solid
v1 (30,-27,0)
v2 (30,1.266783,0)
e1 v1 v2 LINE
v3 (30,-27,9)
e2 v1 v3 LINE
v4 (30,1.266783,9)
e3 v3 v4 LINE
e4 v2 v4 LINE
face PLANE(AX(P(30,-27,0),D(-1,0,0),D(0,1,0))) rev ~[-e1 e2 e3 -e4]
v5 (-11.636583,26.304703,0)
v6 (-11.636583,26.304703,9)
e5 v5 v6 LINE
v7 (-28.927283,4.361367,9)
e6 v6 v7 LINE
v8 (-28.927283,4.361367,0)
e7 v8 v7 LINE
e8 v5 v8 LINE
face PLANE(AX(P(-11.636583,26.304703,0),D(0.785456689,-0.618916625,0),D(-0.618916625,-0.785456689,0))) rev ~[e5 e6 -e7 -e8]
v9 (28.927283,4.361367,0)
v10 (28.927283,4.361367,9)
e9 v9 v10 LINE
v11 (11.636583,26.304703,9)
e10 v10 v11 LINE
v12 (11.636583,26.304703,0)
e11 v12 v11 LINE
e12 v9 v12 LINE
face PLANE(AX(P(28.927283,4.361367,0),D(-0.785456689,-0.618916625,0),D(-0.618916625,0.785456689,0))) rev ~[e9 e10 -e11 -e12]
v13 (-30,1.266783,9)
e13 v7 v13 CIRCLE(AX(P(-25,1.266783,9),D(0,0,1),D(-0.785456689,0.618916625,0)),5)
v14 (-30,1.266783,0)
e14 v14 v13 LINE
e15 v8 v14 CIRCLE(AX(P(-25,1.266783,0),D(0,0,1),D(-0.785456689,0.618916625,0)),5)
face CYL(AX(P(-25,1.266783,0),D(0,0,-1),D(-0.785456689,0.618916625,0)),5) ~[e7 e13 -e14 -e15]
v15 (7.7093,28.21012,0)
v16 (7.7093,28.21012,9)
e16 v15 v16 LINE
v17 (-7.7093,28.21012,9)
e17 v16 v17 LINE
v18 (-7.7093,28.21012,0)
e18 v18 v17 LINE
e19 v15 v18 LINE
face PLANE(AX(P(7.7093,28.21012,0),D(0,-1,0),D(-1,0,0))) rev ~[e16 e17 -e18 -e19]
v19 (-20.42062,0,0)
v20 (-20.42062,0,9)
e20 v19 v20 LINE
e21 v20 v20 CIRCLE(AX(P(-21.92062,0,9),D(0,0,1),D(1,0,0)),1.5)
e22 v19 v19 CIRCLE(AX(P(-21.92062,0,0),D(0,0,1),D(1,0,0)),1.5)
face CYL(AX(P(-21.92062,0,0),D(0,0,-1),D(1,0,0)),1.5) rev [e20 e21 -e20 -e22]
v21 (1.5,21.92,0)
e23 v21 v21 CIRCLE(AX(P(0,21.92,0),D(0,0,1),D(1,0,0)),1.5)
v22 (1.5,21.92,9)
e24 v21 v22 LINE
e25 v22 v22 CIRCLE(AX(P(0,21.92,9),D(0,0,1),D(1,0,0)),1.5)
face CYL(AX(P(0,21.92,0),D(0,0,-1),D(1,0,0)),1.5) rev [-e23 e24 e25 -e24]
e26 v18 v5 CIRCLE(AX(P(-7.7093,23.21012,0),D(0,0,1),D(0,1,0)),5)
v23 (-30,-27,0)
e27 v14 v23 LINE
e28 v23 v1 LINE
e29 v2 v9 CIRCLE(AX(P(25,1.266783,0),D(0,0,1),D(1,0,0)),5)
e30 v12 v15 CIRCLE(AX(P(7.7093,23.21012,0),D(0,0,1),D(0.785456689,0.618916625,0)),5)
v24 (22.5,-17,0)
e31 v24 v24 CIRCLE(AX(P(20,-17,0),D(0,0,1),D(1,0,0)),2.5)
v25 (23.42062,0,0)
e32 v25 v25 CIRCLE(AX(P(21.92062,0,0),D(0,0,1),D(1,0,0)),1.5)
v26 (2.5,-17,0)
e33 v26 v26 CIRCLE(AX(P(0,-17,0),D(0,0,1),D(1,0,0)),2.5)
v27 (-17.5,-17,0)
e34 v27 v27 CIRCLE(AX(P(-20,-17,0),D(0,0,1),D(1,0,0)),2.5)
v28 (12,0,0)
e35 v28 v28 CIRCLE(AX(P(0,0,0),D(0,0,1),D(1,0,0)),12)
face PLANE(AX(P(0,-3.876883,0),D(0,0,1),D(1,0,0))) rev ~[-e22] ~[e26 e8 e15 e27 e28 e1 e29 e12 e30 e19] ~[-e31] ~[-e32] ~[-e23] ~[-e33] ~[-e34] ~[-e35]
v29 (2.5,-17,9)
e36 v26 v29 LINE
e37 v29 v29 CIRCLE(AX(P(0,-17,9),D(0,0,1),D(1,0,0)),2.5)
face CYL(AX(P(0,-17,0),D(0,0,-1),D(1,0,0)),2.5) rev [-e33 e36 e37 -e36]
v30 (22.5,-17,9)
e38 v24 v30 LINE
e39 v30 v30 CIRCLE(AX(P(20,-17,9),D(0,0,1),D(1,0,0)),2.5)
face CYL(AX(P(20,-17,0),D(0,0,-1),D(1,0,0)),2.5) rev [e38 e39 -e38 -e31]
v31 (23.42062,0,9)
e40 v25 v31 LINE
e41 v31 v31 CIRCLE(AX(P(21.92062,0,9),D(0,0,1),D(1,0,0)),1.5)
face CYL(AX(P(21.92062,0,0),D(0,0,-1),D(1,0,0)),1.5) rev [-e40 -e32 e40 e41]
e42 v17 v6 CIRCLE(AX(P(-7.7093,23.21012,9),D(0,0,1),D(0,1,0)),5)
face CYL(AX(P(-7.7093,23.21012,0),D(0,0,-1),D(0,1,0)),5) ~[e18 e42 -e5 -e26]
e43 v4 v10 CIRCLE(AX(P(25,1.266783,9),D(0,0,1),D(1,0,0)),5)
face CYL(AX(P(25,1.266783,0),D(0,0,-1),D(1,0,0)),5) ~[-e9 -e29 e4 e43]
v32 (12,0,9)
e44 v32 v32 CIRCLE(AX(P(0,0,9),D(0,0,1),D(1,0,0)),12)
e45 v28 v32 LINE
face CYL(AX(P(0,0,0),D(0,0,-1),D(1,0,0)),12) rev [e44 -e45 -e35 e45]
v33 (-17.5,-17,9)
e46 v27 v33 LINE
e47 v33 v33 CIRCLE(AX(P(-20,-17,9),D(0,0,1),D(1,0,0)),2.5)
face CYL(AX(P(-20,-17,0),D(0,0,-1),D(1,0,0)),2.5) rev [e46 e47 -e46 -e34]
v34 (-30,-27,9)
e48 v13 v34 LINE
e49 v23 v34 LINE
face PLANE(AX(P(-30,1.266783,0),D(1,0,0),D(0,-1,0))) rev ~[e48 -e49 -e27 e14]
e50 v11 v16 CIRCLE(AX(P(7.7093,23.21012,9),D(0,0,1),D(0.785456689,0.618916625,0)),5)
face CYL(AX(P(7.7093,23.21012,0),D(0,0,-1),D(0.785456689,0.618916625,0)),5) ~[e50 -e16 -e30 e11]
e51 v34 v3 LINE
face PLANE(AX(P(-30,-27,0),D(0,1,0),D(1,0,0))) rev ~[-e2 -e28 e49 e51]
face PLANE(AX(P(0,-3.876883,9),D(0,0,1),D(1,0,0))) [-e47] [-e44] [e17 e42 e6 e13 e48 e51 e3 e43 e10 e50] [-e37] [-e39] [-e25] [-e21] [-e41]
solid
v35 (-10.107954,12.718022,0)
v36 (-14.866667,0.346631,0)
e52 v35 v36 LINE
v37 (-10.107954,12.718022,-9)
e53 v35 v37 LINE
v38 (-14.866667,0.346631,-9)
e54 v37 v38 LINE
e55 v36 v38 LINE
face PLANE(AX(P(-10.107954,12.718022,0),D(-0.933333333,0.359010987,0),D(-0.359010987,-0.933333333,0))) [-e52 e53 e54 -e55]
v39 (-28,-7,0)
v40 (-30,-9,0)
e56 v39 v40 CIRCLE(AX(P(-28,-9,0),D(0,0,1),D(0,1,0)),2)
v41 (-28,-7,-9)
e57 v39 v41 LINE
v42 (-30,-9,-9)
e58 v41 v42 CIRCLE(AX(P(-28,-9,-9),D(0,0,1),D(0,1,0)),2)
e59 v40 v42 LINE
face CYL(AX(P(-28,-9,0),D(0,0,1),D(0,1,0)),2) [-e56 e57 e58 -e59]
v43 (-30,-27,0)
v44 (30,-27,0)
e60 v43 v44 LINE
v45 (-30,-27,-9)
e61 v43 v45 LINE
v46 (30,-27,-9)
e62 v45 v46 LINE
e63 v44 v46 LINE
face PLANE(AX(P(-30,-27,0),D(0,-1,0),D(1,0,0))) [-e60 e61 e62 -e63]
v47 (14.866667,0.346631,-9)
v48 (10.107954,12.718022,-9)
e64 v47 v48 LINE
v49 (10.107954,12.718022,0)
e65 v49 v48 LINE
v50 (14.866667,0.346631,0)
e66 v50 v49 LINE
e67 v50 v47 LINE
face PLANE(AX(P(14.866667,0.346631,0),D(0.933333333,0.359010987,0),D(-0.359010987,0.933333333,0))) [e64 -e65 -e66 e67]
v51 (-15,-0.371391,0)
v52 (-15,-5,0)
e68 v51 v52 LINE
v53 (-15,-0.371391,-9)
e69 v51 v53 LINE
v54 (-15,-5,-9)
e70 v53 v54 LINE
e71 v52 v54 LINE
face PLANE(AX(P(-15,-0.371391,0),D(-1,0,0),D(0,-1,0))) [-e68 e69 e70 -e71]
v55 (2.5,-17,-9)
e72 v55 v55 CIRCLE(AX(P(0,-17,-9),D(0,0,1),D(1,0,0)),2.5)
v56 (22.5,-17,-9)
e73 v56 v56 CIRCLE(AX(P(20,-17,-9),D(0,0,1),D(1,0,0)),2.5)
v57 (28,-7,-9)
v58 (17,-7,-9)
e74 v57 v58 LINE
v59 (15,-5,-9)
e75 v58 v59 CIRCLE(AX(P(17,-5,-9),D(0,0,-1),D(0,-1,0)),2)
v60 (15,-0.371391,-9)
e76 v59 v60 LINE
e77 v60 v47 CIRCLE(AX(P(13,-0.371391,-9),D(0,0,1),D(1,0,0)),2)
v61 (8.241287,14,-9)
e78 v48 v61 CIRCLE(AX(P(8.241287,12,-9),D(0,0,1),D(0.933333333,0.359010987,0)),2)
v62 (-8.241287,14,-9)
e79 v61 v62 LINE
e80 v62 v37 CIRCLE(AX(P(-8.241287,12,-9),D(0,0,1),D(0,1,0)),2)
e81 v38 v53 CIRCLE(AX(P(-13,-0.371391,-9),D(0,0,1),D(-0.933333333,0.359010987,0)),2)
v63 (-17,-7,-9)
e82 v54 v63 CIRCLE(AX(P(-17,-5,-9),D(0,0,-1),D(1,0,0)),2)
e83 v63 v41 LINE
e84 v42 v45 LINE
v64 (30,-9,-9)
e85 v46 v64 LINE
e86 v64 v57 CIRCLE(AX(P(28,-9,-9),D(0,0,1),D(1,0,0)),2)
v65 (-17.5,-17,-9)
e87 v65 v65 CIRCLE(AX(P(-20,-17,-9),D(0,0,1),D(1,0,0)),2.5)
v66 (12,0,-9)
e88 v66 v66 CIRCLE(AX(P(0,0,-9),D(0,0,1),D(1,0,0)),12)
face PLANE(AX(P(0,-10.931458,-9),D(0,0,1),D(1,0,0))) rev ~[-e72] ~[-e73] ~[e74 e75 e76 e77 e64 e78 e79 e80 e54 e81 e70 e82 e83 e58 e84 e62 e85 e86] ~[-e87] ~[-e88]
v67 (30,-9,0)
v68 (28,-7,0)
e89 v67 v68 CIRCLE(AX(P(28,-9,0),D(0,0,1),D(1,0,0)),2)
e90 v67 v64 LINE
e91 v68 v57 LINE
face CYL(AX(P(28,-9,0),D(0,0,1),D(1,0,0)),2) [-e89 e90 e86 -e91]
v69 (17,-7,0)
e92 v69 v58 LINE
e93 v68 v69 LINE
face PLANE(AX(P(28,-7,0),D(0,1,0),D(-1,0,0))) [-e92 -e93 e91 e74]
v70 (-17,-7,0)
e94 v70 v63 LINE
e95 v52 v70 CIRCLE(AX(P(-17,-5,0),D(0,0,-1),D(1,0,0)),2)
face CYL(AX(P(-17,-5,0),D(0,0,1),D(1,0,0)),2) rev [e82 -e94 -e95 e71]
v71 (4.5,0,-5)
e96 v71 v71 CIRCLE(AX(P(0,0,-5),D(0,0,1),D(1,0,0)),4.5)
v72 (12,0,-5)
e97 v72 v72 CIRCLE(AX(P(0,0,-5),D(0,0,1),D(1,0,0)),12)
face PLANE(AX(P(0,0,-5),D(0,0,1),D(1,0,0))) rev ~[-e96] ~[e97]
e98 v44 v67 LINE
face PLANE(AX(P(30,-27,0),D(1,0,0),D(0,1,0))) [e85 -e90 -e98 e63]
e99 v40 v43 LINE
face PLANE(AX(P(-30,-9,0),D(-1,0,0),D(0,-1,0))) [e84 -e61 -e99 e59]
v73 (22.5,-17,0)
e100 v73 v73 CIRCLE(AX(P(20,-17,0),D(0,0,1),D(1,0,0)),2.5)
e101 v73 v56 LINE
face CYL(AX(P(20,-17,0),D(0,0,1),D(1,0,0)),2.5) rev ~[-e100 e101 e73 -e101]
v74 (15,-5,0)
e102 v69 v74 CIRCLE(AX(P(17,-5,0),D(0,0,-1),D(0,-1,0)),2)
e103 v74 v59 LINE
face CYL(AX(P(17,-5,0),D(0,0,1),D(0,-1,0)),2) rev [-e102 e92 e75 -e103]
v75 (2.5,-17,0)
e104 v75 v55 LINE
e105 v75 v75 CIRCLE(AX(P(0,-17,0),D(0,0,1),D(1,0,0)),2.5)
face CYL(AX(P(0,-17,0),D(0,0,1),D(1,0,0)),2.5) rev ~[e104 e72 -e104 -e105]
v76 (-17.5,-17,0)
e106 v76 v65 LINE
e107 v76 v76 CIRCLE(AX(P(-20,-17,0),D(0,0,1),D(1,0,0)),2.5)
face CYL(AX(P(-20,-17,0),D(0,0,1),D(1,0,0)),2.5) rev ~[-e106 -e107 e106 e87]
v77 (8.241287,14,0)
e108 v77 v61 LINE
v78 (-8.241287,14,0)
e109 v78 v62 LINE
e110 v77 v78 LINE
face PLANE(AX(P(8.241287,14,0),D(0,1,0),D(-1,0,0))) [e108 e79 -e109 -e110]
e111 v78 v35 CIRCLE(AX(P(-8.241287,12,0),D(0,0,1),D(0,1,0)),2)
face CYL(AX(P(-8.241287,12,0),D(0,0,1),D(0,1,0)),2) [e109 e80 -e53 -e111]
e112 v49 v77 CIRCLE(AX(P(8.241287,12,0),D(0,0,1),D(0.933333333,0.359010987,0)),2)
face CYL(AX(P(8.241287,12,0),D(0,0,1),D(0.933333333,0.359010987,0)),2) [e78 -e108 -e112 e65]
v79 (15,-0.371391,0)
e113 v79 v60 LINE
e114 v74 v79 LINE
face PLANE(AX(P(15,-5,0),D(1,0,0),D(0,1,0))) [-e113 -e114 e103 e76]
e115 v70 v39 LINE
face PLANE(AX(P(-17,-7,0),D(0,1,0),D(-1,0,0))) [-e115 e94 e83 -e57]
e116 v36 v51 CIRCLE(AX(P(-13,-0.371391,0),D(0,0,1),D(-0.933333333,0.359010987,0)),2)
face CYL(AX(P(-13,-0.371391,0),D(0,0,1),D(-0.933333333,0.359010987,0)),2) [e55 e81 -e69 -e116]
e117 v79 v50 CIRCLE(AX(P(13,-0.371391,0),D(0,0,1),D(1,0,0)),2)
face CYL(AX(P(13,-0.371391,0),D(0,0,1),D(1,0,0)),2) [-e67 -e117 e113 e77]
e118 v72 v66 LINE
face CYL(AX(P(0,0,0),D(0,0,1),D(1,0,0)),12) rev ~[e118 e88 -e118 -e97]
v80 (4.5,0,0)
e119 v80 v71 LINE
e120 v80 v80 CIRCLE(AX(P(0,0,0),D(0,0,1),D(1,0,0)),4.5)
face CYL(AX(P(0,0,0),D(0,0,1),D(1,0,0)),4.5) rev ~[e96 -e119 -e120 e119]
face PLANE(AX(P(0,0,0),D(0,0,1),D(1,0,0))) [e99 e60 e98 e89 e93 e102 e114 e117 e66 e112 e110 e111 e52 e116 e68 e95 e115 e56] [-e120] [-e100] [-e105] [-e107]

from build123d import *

# Parameters (mm, degrees)
F0_R     = 2.5
F0_R_2   = 1.5
F0_R_3   = 12
F2_DEPTH = 9
F1_R     = 2.5
F1_R_2   = 12
F3_DEPTH = 9
F1_R_3   = 4.5
F4_DEPTH = 5


with BuildPart() as f2:
    # F0 (on Top) → F2 (new body)
    with BuildSketch(Plane.XY):
        with BuildLine():
            Line((-1.4435148332, 28.2101202756), (-7.7092999779, 28.2101202756))
            ThreePointArc((-7.7092999779, 28.2101202756), (-9.8918540281, 27.7086153371), (-11.6365834243, 26.3047034029))
            Line((-11.6365834243, 26.3047034029), (-28.9272834464, 4.3613665526))
            ThreePointArc((-28.9272834464, 4.3613665526), (-29.7242151323, 2.9044010192), (-30, 1.2667834253))
            Line((-30, 1.2667834253), (-30, 0))
            Line((-30, 0), (-30, -27))
            Line((-30, -27), (30, -27))
            Line((30, -27), (30, 0))
            Line((30, 0), (30, 1.2667834253))
            ThreePointArc((30, 1.2667834253), (29.7242151323, 2.9044010192), (28.9272834464, 4.3613665526))
            Line((28.9272834464, 4.3613665526), (11.6365834243, 26.3047034029))
            ThreePointArc((11.6365834243, 26.3047034029), (9.8918540281, 27.7086153371), (7.7092999779, 28.2101202756))
            Line((7.7092999779, 28.2101202756), (-1.4435148332, 28.2101202756))
        make_face()
        with Locations((-20, -17)):
            Circle(F0_R, mode=Mode.SUBTRACT)
        with Locations((-21.9206204292, 0)):
            Circle(F0_R_2, mode=Mode.SUBTRACT)
        with Locations((0, -17)):
            Circle(F0_R, mode=Mode.SUBTRACT)
        with Locations((20, -17)):
            Circle(F0_R, mode=Mode.SUBTRACT)
        Circle(F0_R_3, mode=Mode.SUBTRACT)
        with Locations((21.9206204292, 0)):
            Circle(F0_R_2, mode=Mode.SUBTRACT)
        with Locations((0, 21.92)):
            Circle(F0_R_2, mode=Mode.SUBTRACT)
    extrude(amount=F2_DEPTH)


with BuildPart() as f3:
    # F1 (on Top) → F3 (new body)
    with BuildSketch(Plane.XY):
        with BuildLine():
            ThreePointArc((-28, -7), (-29.4142135624, -7.5857864376), (-30, -9))
            Line((-30, -9), (-30, -27))
            Line((-30, -27), (30, -27))
            Line((30, -27), (30, -9))
            ThreePointArc((30, -9), (29.4142135624, -7.5857864376), (28, -7))
            Line((28, -7), (17, -7))
            ThreePointArc((17, -7), (15.5857864376, -6.4142135624), (15, -5))
            Line((15, -5), (15, -0.3713906764))
            ThreePointArc((15, -0.3713906764), (14.9663841605, -0.0062423047), (14.8666666667, 0.3466312979))
            Line((14.8666666667, 0.3466312979), (10.1079539748, 12.7180219743))
            ThreePointArc((10.1079539748, 12.7180219743), (9.3735319927, 13.6486424641), (8.2412873082, 14))
            Line((8.2412873082, 14), (0, 14))
            Line((0, 14), (-8.2412873082, 14))
            ThreePointArc((-8.2412873082, 14), (-9.3735319927, 13.6486424641), (-10.1079539748, 12.7180219743))
            Line((-10.1079539748, 12.7180219743), (-14.8666666667, 0.3466312979))
            ThreePointArc((-14.8666666667, 0.3466312979), (-14.9663841605, -0.0062423047), (-15, -0.3713906764))
            Line((-15, -0.3713906764), (-15, -5))
            ThreePointArc((-15, -5), (-15.5857864376, -6.4142135624), (-17, -7))
            Line((-17, -7), (-28, -7))
        make_face()
        with Locations((-20, -17)):
            Circle(F1_R, mode=Mode.SUBTRACT)
        with Locations((0, -17)):
            Circle(F1_R, mode=Mode.SUBTRACT)
        with Locations((20, -17)):
            Circle(F1_R, mode=Mode.SUBTRACT)
        Circle(F1_R_2, mode=Mode.SUBTRACT)
    extrude(amount=-F3_DEPTH)

    # F1 (on Top) → F4 (join)
    with BuildSketch(Plane.XY):
        Circle(F1_R_2)
        Circle(F1_R_3, mode=Mode.SUBTRACT)
    extrude(amount=-F4_DEPTH)


solid = Compound([f2.part, f3.part])
